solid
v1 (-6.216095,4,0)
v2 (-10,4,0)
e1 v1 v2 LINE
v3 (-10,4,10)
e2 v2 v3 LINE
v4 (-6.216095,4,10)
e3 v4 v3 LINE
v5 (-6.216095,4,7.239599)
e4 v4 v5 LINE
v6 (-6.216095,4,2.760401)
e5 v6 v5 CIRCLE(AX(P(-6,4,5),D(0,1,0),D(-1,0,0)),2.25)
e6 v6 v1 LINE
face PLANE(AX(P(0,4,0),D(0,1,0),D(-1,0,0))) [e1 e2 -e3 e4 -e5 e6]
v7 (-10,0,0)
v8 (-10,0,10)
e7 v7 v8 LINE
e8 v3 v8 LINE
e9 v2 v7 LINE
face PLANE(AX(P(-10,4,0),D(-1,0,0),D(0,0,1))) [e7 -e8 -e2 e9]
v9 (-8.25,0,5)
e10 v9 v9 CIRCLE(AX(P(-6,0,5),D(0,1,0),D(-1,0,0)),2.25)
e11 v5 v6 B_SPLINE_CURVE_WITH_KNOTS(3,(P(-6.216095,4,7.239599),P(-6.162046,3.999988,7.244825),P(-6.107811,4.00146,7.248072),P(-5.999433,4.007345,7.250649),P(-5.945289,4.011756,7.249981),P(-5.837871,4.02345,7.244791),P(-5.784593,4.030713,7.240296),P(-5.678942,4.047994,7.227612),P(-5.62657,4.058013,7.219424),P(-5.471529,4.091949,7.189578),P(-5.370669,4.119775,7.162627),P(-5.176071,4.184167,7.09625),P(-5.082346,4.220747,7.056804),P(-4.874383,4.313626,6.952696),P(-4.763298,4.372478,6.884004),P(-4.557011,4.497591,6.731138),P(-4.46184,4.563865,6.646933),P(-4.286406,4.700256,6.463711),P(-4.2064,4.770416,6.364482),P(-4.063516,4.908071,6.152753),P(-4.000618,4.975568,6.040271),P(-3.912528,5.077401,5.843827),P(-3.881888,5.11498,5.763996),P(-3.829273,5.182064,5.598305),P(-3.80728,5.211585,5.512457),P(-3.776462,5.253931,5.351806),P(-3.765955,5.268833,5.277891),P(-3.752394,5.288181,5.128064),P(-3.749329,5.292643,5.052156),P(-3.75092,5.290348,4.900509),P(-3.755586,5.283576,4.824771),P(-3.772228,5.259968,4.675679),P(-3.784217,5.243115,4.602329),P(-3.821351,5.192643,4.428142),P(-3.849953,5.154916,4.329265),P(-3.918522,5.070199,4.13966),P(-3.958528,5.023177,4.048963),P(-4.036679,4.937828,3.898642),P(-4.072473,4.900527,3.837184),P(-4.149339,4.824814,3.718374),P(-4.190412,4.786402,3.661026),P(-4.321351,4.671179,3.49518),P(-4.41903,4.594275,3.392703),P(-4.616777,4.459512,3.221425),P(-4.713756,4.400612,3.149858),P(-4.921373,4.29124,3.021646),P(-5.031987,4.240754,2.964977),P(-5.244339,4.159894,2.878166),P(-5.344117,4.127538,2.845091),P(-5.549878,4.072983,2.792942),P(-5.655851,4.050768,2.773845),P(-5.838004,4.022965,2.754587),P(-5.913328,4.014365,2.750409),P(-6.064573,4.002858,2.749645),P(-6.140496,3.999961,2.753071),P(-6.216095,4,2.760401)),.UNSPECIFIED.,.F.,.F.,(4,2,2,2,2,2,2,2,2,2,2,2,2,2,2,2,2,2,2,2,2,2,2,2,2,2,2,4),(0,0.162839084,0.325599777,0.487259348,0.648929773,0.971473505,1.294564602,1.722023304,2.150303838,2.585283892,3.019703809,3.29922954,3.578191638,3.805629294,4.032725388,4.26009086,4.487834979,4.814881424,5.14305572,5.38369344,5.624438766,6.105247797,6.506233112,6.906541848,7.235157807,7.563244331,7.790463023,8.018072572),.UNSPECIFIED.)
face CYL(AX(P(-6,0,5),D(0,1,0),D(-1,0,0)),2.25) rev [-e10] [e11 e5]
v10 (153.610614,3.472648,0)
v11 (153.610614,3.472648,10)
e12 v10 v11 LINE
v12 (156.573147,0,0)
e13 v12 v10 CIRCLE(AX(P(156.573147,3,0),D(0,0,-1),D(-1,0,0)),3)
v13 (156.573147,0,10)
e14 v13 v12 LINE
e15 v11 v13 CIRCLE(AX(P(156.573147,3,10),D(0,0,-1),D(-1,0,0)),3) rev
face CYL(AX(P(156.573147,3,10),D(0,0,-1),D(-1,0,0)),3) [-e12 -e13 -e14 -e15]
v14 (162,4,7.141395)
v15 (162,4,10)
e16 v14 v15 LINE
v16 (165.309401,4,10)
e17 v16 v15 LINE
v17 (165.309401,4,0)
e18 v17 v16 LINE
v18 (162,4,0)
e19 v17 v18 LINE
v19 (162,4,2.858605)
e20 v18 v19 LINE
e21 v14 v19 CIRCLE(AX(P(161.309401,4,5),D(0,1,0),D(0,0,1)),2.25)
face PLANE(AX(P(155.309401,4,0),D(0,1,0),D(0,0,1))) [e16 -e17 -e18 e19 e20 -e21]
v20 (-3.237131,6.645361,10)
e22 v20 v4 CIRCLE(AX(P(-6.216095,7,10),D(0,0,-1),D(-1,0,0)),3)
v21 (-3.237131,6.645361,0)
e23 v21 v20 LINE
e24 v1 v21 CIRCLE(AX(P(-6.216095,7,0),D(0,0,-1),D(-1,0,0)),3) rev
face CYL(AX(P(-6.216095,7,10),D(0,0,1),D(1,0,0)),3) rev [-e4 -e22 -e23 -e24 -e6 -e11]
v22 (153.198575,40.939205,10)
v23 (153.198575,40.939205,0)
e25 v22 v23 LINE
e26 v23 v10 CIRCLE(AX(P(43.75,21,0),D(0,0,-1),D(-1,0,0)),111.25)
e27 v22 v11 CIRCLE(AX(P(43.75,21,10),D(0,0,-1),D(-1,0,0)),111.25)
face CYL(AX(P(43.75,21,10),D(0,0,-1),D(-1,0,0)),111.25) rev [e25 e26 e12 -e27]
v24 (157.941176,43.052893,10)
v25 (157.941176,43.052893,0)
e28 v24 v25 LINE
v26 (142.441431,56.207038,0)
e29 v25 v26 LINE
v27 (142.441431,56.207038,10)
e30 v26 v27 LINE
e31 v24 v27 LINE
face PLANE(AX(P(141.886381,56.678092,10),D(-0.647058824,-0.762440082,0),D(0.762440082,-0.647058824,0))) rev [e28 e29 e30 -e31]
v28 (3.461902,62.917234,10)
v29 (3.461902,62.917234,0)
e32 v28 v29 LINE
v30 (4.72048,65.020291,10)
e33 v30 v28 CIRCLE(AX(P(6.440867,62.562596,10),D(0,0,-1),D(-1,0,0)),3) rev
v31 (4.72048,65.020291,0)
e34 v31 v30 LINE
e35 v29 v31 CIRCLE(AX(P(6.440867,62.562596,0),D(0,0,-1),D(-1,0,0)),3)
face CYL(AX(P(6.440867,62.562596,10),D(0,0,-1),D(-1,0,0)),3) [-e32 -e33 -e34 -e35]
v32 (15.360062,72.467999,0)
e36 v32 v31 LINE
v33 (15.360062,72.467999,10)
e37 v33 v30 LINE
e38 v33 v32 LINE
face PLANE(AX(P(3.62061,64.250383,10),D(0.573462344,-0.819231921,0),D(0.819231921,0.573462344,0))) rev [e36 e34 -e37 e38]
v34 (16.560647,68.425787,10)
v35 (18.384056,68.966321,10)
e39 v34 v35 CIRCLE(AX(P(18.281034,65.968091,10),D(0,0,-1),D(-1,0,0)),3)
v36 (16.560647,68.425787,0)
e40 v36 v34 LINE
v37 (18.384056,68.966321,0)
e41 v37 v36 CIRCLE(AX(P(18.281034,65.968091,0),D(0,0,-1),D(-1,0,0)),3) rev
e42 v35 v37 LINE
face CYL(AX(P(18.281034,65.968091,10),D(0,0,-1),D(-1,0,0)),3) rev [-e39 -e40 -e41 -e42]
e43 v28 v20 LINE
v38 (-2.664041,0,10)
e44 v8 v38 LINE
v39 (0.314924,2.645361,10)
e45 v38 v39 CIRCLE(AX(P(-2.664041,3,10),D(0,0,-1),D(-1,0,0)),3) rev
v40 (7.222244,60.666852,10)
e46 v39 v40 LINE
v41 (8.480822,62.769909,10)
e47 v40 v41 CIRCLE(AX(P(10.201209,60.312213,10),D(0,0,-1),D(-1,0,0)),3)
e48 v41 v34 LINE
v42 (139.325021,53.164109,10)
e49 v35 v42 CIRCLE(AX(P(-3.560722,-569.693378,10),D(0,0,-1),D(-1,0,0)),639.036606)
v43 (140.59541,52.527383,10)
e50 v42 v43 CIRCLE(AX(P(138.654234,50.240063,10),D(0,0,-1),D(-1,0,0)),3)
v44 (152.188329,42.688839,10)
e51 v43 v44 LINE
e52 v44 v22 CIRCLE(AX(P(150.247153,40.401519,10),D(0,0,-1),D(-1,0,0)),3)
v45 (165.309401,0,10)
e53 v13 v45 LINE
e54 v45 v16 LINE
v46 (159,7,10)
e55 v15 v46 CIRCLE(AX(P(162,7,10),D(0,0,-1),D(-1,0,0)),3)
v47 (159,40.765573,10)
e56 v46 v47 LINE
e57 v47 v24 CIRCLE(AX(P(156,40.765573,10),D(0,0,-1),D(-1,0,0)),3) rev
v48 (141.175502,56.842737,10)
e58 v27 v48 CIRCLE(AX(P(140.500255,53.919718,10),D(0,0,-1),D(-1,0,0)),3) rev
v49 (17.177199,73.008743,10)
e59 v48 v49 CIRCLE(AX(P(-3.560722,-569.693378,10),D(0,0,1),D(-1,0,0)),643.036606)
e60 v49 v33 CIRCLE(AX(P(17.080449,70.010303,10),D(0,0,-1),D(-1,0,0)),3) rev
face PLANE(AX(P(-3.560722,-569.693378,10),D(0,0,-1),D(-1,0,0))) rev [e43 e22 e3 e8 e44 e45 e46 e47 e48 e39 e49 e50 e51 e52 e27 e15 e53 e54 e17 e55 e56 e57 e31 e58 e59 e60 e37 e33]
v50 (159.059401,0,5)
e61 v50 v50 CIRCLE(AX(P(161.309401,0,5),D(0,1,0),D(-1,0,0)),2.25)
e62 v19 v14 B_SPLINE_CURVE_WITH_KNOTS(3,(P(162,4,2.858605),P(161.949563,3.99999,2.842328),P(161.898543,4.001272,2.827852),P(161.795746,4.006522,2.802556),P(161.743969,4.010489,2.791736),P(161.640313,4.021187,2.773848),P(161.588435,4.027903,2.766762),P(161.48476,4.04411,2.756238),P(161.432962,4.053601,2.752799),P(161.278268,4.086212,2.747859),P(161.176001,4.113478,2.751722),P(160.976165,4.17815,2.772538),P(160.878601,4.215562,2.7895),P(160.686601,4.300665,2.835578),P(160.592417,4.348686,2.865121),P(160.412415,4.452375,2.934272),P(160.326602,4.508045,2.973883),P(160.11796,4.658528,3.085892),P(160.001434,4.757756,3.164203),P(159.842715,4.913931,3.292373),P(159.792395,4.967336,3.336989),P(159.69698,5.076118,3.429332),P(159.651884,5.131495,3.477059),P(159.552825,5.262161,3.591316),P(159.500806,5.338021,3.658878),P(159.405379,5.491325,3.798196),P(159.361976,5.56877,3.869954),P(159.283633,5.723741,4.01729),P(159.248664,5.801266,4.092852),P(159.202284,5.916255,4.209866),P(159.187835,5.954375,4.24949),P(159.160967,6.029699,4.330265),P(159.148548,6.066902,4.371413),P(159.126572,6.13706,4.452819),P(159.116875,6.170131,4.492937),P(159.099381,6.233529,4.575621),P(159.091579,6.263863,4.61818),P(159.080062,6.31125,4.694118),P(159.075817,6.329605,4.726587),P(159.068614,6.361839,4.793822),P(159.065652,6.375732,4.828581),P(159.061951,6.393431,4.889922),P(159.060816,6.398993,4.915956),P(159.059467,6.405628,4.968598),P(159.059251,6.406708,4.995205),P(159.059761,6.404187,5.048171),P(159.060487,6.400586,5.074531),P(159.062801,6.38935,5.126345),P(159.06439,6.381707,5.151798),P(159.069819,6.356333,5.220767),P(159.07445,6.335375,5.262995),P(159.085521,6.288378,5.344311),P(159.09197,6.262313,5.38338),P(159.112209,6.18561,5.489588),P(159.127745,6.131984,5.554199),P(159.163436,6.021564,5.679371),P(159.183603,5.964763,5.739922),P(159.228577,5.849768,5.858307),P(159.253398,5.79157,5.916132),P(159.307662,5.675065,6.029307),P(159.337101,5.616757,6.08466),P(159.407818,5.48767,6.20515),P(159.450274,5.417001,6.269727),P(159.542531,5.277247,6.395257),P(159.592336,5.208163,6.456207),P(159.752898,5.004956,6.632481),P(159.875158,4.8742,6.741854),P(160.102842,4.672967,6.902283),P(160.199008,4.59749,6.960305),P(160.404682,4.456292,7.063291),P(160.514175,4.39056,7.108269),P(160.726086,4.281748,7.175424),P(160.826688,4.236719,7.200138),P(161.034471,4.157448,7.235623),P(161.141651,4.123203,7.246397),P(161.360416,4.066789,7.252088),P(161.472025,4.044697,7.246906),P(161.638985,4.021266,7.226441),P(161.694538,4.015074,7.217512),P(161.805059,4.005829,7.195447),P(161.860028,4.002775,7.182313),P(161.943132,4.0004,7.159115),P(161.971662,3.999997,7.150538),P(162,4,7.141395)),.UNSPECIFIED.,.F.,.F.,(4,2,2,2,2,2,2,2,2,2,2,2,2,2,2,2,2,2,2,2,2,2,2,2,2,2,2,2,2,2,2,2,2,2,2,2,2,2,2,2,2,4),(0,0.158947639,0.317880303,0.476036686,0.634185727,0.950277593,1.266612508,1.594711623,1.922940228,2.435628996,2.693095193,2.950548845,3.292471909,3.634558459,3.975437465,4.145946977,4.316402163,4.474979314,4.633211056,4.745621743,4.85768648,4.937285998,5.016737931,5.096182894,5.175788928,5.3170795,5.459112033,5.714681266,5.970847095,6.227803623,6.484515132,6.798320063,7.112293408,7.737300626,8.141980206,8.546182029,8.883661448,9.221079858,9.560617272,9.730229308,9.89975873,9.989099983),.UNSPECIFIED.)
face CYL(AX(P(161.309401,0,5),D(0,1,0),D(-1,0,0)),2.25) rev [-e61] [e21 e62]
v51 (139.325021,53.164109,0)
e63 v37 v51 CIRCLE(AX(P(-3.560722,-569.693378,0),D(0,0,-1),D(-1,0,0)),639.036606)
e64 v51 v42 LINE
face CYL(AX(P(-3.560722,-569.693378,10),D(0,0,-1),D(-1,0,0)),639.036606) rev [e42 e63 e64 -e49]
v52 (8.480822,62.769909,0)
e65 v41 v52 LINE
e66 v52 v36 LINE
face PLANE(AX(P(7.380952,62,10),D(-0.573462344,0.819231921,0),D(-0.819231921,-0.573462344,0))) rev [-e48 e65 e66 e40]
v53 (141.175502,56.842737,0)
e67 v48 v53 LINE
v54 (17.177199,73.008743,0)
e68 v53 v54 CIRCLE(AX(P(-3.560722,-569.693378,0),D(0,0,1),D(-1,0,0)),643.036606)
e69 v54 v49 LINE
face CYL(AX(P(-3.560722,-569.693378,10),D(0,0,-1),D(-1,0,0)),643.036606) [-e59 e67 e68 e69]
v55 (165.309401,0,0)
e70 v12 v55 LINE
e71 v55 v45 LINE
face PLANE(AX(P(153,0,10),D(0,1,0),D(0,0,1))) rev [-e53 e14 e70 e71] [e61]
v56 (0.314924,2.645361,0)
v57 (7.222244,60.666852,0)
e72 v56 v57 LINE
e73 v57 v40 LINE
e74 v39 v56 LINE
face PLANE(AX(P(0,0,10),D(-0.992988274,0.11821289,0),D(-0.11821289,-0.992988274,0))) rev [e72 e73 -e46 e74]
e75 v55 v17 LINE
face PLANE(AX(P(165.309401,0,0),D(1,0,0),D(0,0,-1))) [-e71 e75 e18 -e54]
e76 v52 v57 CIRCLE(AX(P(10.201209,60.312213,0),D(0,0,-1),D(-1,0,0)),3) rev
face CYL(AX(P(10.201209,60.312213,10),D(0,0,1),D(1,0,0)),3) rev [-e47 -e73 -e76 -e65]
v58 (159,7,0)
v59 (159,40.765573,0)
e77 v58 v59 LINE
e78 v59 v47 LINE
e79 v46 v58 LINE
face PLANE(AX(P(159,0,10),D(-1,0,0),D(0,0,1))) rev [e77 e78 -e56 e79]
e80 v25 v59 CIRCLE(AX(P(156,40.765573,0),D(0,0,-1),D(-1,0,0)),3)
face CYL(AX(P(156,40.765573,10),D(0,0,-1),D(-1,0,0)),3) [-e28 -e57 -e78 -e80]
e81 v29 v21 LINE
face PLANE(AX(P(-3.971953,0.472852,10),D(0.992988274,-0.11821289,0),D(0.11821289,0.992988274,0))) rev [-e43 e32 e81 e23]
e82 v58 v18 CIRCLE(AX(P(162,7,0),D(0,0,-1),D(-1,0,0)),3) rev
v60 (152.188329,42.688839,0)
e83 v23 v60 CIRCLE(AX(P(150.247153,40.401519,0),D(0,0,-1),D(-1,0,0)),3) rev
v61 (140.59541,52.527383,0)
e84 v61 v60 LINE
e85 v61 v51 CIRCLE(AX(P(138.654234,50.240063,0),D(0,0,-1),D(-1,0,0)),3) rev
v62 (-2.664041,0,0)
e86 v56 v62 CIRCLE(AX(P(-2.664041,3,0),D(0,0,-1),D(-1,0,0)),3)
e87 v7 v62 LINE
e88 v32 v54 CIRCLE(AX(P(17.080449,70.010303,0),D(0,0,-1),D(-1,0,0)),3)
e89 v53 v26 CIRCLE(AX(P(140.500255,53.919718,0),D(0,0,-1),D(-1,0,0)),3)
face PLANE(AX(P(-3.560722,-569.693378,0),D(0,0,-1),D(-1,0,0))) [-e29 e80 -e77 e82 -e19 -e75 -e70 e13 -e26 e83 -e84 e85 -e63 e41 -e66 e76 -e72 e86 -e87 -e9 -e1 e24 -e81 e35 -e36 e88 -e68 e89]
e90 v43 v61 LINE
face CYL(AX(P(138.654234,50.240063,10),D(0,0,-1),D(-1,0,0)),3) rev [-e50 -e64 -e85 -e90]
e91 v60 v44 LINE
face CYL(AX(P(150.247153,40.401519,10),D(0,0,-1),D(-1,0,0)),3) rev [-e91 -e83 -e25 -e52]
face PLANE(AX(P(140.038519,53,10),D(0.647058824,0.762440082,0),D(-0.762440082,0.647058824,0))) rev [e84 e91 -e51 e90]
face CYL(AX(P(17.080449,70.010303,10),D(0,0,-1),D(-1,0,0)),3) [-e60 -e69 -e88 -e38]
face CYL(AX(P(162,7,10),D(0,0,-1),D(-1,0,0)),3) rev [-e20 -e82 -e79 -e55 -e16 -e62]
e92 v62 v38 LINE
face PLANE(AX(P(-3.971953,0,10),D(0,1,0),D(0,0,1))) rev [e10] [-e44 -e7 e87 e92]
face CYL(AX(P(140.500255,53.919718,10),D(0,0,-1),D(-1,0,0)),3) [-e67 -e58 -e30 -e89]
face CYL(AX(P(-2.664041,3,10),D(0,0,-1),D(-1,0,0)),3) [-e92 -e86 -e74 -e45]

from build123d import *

# Parameters (mm, degrees)
BOSS_EXTRU_1_DEPTH           = 10
ESQUISSE2_W                  = 10
ESQUISSE2_H                  = 4
BOSS_EXTRU_2_DEPTH           = 10
ENL_V_MAT_EXTRU_1_DEPTH      = 180.426169252
ENL_V_MAT_EXTRU_1_DEPTH_BACK = 180.426169252
ESQUISSE3_R                  = 2.25
CONG_1_START                 = -1
CONG_1_DEPTH                 = 12
CONG_1_START_2               = 7.2500001
CONG_1_2_DEPTH               = 2.7499999
CONG_1_3_DEPTH               = 2.749998557
CONG_1_START_3               = 1.0274
CONG_1_4_DEPTH               = 7.9164
CONG_1_START_4               = 2.749998557
CONG_1_5_DEPTH               = 4.500001543
CONG_1_START_5               = 4
CONG_1_6_OUTLINE_R           = 2.25
CONG_1_6_DEPTH               = 2.645361331


with BuildPart() as part:
    # Esquisse1 → Boss.-Extru.1 (new body)
    with BuildSketch(Plane.XY):
        with BuildLine():
            Line((0, 0), (7.380952381, 62))
            Line((7.380952381, 62), (17.380952381, 69))
            ThreePointArc((17.380952381, 69), (79.097781351, 63.974797541), (140.038518603, 53))
            Line((140.038518603, 53), (153, 42))
            ThreePointArc((153, 42), (155, 21), (153, 0))
            Line((153, 0), (159, 0))
            Line((159, 0), (159, 42.15430335))
            Line((159, 42.15430335), (156.65156229, 44.147348282))
            Line((156.65156229, 44.147348282), (141.886380642, 56.678091733))
            ThreePointArc((141.886380642, 56.678091733), (79.436142512, 67.964522606), (16.177522156, 73.040221089))
            Line((16.177522156, 73.040221089), (3.620610131, 64.250382671))
            Line((3.620610131, 64.250382671), (-3.971953097, 0.472851559))
            Line((-3.971953097, 0.472851559), (-3.971953097, 0))
            Line((-3.971953097, 0), (0, 0))
        make_face()
    extrude(amount=BOSS_EXTRU_1_DEPTH)

    # Esquisse2 → Boss.-Extru.2 (add)
    with BuildSketch(Plane.XY.offset(10)):
        with Locations((-5, 2)):
            Rectangle(ESQUISSE2_W, ESQUISSE2_H)
        Polygon((155.309401077, 4), (153, 0), (165.309401077, 0), (165.309401077, 4), align=None)
    extrude(amount=-BOSS_EXTRU_2_DEPTH)

    # Esquisse3 → Enlèv. mat.-Extru.1 (cut, two sides: drawn at the far end of the back side and taken through both)
    with BuildSketch(Plane(origin=(0, 4, 0), x_dir=(1, 0, 0), z_dir=(0, 1, 0)).offset(-ENL_V_MAT_EXTRU_1_DEPTH_BACK)):
        with Locations(Location((-6, -5, 0), (0, 0, 180))):
            Circle(ESQUISSE3_R)
        with Locations(Location((161.309401077, -5, 0), (0, 0, 180))):
            Circle(ESQUISSE3_R)
    extrude(amount=ENL_V_MAT_EXTRU_1_DEPTH + ENL_V_MAT_EXTRU_1_DEPTH_BACK, mode=Mode.SUBTRACT)

    # Congé1: read off the stored shape, not the designer's step
    # Congé1 outline → Congé1 (cut)
    with BuildSketch(Plane.XY.offset(CONG_1_START)):
        with BuildLine():
            Line((16.177522156, 73.040221089), (15.360062357, 72.46799923))
            ThreePointArc((15.360062357, 72.46799923), (16.22479158, 72.885690349), (17.177199346, 73.00874297))
            ThreePointArc((17.177199346, 73.00874297), (16.677366871, 73.02467639), (16.177522156, 73.040221089))
        make_face()
        with BuildLine():
            ThreePointArc((3.461901996, 62.917234337), (3.866631155, 64.103151006), (4.720479785, 65.020291429))
            Line((4.720479785, 65.020291429), (3.620610131, 64.250382671))
            Line((3.620610131, 64.250382671), (3.461901996, 62.917234337))
        make_face()
        with BuildLine():
            Line((159, 42.15430335), (157.941176471, 43.052893447))
            ThreePointArc((157.941176471, 43.052893447), (158.722455639, 42.025825276), (159, 40.7655732))
            Line((159, 40.7655732), (159, 42.15430335))
        make_face()
        with BuildLine():
            ThreePointArc((141.886380642, 56.678091733), (141.530964579, 56.760515154), (141.175501808, 56.842736905))
            ThreePointArc((141.175501808, 56.842736905), (141.846525936, 56.600679011), (142.441431075, 56.207037956))
            Line((142.441431075, 56.207037956), (141.886380642, 56.678091733))
        make_face()
        with BuildLine():
            Line((0, 0), (0.314923968, 2.645361331))
            ThreePointArc((0.314923968, 2.645361331), (-0.672046378, 0.756797378), (-2.664040855, 0))
            Line((-2.664040855, 0), (0, 0))
        make_face()
        with BuildLine():
            ThreePointArc((156.573147005, 0), (154.290829859, 1.052943646), (153.610613604, 3.472647702))
            ThreePointArc((153.610613604, 3.472647702), (153.319065292, 1.733904625), (153, 0))
            Line((153, 0), (156.573147005, 0))
        make_face()
    extrude(amount=CONG_1_DEPTH, mode=Mode.SUBTRACT)

    # Cong_1 2 outline → Cong_1 2 (add)
    with BuildSketch(Plane.XY.offset(CONG_1_START_2)):
        with BuildLine():
            Line((-3.552054473, 4), (-3.237130505, 6.645361331))
            ThreePointArc((-3.237130505, 6.645361331), (-4.224100851, 4.756797378), (-6.216095328, 4))
            Line((-6.216095328, 4), (-3.552054473, 4))
        make_face()
        with BuildLine():
            ThreePointArc((162, 4), (159.878679656, 4.878679656), (159, 7))
            Line((159, 7), (159, 4))
            Line((159, 4), (162, 4))
        make_face()
        with BuildLine():
            Line((153, 42), (152.188329288, 42.688839304))
            ThreePointArc((152.188329288, 42.688839304), (152.845168439, 41.901623997), (153.198575067, 40.939205498))
            ThreePointArc((153.198575067, 40.939205498), (153.100573868, 41.469843544), (153, 42))
        make_face()
        with BuildLine():
            ThreePointArc((7.222244246, 60.666851666), (7.626973405, 61.852768335), (8.480822035, 62.769908758))
            Line((8.480822035, 62.769908758), (7.380952381, 62))
            Line((7.380952381, 62), (7.222244246, 60.666851666))
        make_face()
        with BuildLine():
            ThreePointArc((16.560647408, 68.425786519), (17.428384152, 68.844370904), (18.384055662, 68.96632134))
            ThreePointArc((18.384055662, 68.96632134), (17.882510633, 68.983357604), (17.380952381, 69))
            Line((17.380952381, 69), (16.560647408, 68.425786519))
        make_face()
        with BuildLine():
            ThreePointArc((139.325020621, 53.164109281), (139.998459684, 52.922050789), (140.595410438, 52.527383484))
            Line((140.595410438, 52.527383484), (140.038518603, 53))
            ThreePointArc((140.038518603, 53), (139.681793114, 53.08215682), (139.325020621, 53.164109281))
        make_face()
    extrude(amount=CONG_1_2_DEPTH)

    # Cong_1 3 outline → Cong_1 3 (add)
    with BuildSketch(Plane.XY):
        with BuildLine():
            Line((-3.552054473, 4), (-3.237130505, 6.645361331))
            ThreePointArc((-3.237130505, 6.645361331), (-4.224100851, 4.756797378), (-6.216095328, 4))
            Line((-6.216095328, 4), (-3.552054473, 4))
        make_face()
        with BuildLine():
            ThreePointArc((162, 4), (159.878679656, 4.878679656), (159, 7))
            Line((159, 7), (159, 4))
            Line((159, 4), (162, 4))
        make_face()
        with BuildLine():
            Line((153, 42), (152.188329288, 42.688839304))
            ThreePointArc((152.188329288, 42.688839304), (152.845168439, 41.901623997), (153.198575067, 40.939205498))
            ThreePointArc((153.198575067, 40.939205498), (153.100573868, 41.469843544), (153, 42))
        make_face()
        with BuildLine():
            ThreePointArc((7.222244246, 60.666851666), (7.626973405, 61.852768335), (8.480822035, 62.769908758))
            Line((8.480822035, 62.769908758), (7.380952381, 62))
            Line((7.380952381, 62), (7.222244246, 60.666851666))
        make_face()
        with BuildLine():
            ThreePointArc((16.560647408, 68.425786519), (17.428384152, 68.844370904), (18.384055662, 68.96632134))
            ThreePointArc((18.384055662, 68.96632134), (17.882510633, 68.983357604), (17.380952381, 69))
            Line((17.380952381, 69), (16.560647408, 68.425786519))
        make_face()
        with BuildLine():
            ThreePointArc((139.325020621, 53.164109281), (139.998459684, 52.922050789), (140.595410438, 52.527383484))
            Line((140.595410438, 52.527383484), (140.038518603, 53))
            ThreePointArc((140.038518603, 53), (139.681793114, 53.08215682), (139.325020621, 53.164109281))
        make_face()
    extrude(amount=CONG_1_3_DEPTH)

    # Cong_1 4 outline → Cong_1 4 (add)
    with BuildSketch(Plane.XY.offset(CONG_1_START_3)):
        with BuildLine():
            Line((153, 42), (152.188329288, 42.688839304))
            ThreePointArc((152.188329288, 42.688839304), (152.845168439, 41.901623997), (153.198575067, 40.939205498))
            ThreePointArc((153.198575067, 40.939205498), (153.100573868, 41.469843544), (153, 42))
        make_face()
        with BuildLine():
            ThreePointArc((7.222244246, 60.666851666), (7.626973405, 61.852768335), (8.480822035, 62.769908758))
            Line((8.480822035, 62.769908758), (7.380952381, 62))
            Line((7.380952381, 62), (7.222244246, 60.666851666))
        make_face()
        with BuildLine():
            ThreePointArc((16.560647408, 68.425786519), (17.428384152, 68.844370904), (18.384055662, 68.96632134))
            ThreePointArc((18.384055662, 68.96632134), (17.882510633, 68.983357604), (17.380952381, 69))
            Line((17.380952381, 69), (16.560647408, 68.425786519))
        make_face()
        with BuildLine():
            ThreePointArc((139.325020621, 53.164109281), (139.998459684, 52.922050789), (140.595410438, 52.527383484))
            Line((140.595410438, 52.527383484), (140.038518603, 53))
            ThreePointArc((140.038518603, 53), (139.681793114, 53.08215682), (139.325020621, 53.164109281))
        make_face()
    extrude(amount=CONG_1_4_DEPTH)

    # Cong_1 5 outline → Cong_1 5 (add)
    with BuildSketch(Plane.XY.offset(CONG_1_START_4)):
        with BuildLine():
            Line((159, 4), (162, 4))
            ThreePointArc((162, 4), (159.878679656, 4.878679656), (159, 7))
            Line((159, 7), (159, 4))
        make_face()
        with BuildLine():
            ThreePointArc((-3.237130505, 6.645361331), (-4.224100851, 4.756797378), (-6.216095328, 4))
            Line((-6.216095328, 4), (-3.552054473, 4))
            Line((-3.552054473, 4), (-3.237130505, 6.645361331))
        make_face()
    extrude(amount=CONG_1_5_DEPTH)

    # Cong_1 6 outline → Cong_1 6 (cut)
    with BuildSketch(Plane(origin=(0, 0, 0), x_dir=(1, 0, 0), z_dir=(0, 1, 0)).offset(CONG_1_START_5)):
        with Locations((161.309401077, -5)):
            Circle(CONG_1_6_OUTLINE_R)
        with Locations((-6, -5)):
            Circle(CONG_1_6_OUTLINE_R)
    extrude(amount=CONG_1_6_DEPTH, mode=Mode.SUBTRACT)


solid = part.part
